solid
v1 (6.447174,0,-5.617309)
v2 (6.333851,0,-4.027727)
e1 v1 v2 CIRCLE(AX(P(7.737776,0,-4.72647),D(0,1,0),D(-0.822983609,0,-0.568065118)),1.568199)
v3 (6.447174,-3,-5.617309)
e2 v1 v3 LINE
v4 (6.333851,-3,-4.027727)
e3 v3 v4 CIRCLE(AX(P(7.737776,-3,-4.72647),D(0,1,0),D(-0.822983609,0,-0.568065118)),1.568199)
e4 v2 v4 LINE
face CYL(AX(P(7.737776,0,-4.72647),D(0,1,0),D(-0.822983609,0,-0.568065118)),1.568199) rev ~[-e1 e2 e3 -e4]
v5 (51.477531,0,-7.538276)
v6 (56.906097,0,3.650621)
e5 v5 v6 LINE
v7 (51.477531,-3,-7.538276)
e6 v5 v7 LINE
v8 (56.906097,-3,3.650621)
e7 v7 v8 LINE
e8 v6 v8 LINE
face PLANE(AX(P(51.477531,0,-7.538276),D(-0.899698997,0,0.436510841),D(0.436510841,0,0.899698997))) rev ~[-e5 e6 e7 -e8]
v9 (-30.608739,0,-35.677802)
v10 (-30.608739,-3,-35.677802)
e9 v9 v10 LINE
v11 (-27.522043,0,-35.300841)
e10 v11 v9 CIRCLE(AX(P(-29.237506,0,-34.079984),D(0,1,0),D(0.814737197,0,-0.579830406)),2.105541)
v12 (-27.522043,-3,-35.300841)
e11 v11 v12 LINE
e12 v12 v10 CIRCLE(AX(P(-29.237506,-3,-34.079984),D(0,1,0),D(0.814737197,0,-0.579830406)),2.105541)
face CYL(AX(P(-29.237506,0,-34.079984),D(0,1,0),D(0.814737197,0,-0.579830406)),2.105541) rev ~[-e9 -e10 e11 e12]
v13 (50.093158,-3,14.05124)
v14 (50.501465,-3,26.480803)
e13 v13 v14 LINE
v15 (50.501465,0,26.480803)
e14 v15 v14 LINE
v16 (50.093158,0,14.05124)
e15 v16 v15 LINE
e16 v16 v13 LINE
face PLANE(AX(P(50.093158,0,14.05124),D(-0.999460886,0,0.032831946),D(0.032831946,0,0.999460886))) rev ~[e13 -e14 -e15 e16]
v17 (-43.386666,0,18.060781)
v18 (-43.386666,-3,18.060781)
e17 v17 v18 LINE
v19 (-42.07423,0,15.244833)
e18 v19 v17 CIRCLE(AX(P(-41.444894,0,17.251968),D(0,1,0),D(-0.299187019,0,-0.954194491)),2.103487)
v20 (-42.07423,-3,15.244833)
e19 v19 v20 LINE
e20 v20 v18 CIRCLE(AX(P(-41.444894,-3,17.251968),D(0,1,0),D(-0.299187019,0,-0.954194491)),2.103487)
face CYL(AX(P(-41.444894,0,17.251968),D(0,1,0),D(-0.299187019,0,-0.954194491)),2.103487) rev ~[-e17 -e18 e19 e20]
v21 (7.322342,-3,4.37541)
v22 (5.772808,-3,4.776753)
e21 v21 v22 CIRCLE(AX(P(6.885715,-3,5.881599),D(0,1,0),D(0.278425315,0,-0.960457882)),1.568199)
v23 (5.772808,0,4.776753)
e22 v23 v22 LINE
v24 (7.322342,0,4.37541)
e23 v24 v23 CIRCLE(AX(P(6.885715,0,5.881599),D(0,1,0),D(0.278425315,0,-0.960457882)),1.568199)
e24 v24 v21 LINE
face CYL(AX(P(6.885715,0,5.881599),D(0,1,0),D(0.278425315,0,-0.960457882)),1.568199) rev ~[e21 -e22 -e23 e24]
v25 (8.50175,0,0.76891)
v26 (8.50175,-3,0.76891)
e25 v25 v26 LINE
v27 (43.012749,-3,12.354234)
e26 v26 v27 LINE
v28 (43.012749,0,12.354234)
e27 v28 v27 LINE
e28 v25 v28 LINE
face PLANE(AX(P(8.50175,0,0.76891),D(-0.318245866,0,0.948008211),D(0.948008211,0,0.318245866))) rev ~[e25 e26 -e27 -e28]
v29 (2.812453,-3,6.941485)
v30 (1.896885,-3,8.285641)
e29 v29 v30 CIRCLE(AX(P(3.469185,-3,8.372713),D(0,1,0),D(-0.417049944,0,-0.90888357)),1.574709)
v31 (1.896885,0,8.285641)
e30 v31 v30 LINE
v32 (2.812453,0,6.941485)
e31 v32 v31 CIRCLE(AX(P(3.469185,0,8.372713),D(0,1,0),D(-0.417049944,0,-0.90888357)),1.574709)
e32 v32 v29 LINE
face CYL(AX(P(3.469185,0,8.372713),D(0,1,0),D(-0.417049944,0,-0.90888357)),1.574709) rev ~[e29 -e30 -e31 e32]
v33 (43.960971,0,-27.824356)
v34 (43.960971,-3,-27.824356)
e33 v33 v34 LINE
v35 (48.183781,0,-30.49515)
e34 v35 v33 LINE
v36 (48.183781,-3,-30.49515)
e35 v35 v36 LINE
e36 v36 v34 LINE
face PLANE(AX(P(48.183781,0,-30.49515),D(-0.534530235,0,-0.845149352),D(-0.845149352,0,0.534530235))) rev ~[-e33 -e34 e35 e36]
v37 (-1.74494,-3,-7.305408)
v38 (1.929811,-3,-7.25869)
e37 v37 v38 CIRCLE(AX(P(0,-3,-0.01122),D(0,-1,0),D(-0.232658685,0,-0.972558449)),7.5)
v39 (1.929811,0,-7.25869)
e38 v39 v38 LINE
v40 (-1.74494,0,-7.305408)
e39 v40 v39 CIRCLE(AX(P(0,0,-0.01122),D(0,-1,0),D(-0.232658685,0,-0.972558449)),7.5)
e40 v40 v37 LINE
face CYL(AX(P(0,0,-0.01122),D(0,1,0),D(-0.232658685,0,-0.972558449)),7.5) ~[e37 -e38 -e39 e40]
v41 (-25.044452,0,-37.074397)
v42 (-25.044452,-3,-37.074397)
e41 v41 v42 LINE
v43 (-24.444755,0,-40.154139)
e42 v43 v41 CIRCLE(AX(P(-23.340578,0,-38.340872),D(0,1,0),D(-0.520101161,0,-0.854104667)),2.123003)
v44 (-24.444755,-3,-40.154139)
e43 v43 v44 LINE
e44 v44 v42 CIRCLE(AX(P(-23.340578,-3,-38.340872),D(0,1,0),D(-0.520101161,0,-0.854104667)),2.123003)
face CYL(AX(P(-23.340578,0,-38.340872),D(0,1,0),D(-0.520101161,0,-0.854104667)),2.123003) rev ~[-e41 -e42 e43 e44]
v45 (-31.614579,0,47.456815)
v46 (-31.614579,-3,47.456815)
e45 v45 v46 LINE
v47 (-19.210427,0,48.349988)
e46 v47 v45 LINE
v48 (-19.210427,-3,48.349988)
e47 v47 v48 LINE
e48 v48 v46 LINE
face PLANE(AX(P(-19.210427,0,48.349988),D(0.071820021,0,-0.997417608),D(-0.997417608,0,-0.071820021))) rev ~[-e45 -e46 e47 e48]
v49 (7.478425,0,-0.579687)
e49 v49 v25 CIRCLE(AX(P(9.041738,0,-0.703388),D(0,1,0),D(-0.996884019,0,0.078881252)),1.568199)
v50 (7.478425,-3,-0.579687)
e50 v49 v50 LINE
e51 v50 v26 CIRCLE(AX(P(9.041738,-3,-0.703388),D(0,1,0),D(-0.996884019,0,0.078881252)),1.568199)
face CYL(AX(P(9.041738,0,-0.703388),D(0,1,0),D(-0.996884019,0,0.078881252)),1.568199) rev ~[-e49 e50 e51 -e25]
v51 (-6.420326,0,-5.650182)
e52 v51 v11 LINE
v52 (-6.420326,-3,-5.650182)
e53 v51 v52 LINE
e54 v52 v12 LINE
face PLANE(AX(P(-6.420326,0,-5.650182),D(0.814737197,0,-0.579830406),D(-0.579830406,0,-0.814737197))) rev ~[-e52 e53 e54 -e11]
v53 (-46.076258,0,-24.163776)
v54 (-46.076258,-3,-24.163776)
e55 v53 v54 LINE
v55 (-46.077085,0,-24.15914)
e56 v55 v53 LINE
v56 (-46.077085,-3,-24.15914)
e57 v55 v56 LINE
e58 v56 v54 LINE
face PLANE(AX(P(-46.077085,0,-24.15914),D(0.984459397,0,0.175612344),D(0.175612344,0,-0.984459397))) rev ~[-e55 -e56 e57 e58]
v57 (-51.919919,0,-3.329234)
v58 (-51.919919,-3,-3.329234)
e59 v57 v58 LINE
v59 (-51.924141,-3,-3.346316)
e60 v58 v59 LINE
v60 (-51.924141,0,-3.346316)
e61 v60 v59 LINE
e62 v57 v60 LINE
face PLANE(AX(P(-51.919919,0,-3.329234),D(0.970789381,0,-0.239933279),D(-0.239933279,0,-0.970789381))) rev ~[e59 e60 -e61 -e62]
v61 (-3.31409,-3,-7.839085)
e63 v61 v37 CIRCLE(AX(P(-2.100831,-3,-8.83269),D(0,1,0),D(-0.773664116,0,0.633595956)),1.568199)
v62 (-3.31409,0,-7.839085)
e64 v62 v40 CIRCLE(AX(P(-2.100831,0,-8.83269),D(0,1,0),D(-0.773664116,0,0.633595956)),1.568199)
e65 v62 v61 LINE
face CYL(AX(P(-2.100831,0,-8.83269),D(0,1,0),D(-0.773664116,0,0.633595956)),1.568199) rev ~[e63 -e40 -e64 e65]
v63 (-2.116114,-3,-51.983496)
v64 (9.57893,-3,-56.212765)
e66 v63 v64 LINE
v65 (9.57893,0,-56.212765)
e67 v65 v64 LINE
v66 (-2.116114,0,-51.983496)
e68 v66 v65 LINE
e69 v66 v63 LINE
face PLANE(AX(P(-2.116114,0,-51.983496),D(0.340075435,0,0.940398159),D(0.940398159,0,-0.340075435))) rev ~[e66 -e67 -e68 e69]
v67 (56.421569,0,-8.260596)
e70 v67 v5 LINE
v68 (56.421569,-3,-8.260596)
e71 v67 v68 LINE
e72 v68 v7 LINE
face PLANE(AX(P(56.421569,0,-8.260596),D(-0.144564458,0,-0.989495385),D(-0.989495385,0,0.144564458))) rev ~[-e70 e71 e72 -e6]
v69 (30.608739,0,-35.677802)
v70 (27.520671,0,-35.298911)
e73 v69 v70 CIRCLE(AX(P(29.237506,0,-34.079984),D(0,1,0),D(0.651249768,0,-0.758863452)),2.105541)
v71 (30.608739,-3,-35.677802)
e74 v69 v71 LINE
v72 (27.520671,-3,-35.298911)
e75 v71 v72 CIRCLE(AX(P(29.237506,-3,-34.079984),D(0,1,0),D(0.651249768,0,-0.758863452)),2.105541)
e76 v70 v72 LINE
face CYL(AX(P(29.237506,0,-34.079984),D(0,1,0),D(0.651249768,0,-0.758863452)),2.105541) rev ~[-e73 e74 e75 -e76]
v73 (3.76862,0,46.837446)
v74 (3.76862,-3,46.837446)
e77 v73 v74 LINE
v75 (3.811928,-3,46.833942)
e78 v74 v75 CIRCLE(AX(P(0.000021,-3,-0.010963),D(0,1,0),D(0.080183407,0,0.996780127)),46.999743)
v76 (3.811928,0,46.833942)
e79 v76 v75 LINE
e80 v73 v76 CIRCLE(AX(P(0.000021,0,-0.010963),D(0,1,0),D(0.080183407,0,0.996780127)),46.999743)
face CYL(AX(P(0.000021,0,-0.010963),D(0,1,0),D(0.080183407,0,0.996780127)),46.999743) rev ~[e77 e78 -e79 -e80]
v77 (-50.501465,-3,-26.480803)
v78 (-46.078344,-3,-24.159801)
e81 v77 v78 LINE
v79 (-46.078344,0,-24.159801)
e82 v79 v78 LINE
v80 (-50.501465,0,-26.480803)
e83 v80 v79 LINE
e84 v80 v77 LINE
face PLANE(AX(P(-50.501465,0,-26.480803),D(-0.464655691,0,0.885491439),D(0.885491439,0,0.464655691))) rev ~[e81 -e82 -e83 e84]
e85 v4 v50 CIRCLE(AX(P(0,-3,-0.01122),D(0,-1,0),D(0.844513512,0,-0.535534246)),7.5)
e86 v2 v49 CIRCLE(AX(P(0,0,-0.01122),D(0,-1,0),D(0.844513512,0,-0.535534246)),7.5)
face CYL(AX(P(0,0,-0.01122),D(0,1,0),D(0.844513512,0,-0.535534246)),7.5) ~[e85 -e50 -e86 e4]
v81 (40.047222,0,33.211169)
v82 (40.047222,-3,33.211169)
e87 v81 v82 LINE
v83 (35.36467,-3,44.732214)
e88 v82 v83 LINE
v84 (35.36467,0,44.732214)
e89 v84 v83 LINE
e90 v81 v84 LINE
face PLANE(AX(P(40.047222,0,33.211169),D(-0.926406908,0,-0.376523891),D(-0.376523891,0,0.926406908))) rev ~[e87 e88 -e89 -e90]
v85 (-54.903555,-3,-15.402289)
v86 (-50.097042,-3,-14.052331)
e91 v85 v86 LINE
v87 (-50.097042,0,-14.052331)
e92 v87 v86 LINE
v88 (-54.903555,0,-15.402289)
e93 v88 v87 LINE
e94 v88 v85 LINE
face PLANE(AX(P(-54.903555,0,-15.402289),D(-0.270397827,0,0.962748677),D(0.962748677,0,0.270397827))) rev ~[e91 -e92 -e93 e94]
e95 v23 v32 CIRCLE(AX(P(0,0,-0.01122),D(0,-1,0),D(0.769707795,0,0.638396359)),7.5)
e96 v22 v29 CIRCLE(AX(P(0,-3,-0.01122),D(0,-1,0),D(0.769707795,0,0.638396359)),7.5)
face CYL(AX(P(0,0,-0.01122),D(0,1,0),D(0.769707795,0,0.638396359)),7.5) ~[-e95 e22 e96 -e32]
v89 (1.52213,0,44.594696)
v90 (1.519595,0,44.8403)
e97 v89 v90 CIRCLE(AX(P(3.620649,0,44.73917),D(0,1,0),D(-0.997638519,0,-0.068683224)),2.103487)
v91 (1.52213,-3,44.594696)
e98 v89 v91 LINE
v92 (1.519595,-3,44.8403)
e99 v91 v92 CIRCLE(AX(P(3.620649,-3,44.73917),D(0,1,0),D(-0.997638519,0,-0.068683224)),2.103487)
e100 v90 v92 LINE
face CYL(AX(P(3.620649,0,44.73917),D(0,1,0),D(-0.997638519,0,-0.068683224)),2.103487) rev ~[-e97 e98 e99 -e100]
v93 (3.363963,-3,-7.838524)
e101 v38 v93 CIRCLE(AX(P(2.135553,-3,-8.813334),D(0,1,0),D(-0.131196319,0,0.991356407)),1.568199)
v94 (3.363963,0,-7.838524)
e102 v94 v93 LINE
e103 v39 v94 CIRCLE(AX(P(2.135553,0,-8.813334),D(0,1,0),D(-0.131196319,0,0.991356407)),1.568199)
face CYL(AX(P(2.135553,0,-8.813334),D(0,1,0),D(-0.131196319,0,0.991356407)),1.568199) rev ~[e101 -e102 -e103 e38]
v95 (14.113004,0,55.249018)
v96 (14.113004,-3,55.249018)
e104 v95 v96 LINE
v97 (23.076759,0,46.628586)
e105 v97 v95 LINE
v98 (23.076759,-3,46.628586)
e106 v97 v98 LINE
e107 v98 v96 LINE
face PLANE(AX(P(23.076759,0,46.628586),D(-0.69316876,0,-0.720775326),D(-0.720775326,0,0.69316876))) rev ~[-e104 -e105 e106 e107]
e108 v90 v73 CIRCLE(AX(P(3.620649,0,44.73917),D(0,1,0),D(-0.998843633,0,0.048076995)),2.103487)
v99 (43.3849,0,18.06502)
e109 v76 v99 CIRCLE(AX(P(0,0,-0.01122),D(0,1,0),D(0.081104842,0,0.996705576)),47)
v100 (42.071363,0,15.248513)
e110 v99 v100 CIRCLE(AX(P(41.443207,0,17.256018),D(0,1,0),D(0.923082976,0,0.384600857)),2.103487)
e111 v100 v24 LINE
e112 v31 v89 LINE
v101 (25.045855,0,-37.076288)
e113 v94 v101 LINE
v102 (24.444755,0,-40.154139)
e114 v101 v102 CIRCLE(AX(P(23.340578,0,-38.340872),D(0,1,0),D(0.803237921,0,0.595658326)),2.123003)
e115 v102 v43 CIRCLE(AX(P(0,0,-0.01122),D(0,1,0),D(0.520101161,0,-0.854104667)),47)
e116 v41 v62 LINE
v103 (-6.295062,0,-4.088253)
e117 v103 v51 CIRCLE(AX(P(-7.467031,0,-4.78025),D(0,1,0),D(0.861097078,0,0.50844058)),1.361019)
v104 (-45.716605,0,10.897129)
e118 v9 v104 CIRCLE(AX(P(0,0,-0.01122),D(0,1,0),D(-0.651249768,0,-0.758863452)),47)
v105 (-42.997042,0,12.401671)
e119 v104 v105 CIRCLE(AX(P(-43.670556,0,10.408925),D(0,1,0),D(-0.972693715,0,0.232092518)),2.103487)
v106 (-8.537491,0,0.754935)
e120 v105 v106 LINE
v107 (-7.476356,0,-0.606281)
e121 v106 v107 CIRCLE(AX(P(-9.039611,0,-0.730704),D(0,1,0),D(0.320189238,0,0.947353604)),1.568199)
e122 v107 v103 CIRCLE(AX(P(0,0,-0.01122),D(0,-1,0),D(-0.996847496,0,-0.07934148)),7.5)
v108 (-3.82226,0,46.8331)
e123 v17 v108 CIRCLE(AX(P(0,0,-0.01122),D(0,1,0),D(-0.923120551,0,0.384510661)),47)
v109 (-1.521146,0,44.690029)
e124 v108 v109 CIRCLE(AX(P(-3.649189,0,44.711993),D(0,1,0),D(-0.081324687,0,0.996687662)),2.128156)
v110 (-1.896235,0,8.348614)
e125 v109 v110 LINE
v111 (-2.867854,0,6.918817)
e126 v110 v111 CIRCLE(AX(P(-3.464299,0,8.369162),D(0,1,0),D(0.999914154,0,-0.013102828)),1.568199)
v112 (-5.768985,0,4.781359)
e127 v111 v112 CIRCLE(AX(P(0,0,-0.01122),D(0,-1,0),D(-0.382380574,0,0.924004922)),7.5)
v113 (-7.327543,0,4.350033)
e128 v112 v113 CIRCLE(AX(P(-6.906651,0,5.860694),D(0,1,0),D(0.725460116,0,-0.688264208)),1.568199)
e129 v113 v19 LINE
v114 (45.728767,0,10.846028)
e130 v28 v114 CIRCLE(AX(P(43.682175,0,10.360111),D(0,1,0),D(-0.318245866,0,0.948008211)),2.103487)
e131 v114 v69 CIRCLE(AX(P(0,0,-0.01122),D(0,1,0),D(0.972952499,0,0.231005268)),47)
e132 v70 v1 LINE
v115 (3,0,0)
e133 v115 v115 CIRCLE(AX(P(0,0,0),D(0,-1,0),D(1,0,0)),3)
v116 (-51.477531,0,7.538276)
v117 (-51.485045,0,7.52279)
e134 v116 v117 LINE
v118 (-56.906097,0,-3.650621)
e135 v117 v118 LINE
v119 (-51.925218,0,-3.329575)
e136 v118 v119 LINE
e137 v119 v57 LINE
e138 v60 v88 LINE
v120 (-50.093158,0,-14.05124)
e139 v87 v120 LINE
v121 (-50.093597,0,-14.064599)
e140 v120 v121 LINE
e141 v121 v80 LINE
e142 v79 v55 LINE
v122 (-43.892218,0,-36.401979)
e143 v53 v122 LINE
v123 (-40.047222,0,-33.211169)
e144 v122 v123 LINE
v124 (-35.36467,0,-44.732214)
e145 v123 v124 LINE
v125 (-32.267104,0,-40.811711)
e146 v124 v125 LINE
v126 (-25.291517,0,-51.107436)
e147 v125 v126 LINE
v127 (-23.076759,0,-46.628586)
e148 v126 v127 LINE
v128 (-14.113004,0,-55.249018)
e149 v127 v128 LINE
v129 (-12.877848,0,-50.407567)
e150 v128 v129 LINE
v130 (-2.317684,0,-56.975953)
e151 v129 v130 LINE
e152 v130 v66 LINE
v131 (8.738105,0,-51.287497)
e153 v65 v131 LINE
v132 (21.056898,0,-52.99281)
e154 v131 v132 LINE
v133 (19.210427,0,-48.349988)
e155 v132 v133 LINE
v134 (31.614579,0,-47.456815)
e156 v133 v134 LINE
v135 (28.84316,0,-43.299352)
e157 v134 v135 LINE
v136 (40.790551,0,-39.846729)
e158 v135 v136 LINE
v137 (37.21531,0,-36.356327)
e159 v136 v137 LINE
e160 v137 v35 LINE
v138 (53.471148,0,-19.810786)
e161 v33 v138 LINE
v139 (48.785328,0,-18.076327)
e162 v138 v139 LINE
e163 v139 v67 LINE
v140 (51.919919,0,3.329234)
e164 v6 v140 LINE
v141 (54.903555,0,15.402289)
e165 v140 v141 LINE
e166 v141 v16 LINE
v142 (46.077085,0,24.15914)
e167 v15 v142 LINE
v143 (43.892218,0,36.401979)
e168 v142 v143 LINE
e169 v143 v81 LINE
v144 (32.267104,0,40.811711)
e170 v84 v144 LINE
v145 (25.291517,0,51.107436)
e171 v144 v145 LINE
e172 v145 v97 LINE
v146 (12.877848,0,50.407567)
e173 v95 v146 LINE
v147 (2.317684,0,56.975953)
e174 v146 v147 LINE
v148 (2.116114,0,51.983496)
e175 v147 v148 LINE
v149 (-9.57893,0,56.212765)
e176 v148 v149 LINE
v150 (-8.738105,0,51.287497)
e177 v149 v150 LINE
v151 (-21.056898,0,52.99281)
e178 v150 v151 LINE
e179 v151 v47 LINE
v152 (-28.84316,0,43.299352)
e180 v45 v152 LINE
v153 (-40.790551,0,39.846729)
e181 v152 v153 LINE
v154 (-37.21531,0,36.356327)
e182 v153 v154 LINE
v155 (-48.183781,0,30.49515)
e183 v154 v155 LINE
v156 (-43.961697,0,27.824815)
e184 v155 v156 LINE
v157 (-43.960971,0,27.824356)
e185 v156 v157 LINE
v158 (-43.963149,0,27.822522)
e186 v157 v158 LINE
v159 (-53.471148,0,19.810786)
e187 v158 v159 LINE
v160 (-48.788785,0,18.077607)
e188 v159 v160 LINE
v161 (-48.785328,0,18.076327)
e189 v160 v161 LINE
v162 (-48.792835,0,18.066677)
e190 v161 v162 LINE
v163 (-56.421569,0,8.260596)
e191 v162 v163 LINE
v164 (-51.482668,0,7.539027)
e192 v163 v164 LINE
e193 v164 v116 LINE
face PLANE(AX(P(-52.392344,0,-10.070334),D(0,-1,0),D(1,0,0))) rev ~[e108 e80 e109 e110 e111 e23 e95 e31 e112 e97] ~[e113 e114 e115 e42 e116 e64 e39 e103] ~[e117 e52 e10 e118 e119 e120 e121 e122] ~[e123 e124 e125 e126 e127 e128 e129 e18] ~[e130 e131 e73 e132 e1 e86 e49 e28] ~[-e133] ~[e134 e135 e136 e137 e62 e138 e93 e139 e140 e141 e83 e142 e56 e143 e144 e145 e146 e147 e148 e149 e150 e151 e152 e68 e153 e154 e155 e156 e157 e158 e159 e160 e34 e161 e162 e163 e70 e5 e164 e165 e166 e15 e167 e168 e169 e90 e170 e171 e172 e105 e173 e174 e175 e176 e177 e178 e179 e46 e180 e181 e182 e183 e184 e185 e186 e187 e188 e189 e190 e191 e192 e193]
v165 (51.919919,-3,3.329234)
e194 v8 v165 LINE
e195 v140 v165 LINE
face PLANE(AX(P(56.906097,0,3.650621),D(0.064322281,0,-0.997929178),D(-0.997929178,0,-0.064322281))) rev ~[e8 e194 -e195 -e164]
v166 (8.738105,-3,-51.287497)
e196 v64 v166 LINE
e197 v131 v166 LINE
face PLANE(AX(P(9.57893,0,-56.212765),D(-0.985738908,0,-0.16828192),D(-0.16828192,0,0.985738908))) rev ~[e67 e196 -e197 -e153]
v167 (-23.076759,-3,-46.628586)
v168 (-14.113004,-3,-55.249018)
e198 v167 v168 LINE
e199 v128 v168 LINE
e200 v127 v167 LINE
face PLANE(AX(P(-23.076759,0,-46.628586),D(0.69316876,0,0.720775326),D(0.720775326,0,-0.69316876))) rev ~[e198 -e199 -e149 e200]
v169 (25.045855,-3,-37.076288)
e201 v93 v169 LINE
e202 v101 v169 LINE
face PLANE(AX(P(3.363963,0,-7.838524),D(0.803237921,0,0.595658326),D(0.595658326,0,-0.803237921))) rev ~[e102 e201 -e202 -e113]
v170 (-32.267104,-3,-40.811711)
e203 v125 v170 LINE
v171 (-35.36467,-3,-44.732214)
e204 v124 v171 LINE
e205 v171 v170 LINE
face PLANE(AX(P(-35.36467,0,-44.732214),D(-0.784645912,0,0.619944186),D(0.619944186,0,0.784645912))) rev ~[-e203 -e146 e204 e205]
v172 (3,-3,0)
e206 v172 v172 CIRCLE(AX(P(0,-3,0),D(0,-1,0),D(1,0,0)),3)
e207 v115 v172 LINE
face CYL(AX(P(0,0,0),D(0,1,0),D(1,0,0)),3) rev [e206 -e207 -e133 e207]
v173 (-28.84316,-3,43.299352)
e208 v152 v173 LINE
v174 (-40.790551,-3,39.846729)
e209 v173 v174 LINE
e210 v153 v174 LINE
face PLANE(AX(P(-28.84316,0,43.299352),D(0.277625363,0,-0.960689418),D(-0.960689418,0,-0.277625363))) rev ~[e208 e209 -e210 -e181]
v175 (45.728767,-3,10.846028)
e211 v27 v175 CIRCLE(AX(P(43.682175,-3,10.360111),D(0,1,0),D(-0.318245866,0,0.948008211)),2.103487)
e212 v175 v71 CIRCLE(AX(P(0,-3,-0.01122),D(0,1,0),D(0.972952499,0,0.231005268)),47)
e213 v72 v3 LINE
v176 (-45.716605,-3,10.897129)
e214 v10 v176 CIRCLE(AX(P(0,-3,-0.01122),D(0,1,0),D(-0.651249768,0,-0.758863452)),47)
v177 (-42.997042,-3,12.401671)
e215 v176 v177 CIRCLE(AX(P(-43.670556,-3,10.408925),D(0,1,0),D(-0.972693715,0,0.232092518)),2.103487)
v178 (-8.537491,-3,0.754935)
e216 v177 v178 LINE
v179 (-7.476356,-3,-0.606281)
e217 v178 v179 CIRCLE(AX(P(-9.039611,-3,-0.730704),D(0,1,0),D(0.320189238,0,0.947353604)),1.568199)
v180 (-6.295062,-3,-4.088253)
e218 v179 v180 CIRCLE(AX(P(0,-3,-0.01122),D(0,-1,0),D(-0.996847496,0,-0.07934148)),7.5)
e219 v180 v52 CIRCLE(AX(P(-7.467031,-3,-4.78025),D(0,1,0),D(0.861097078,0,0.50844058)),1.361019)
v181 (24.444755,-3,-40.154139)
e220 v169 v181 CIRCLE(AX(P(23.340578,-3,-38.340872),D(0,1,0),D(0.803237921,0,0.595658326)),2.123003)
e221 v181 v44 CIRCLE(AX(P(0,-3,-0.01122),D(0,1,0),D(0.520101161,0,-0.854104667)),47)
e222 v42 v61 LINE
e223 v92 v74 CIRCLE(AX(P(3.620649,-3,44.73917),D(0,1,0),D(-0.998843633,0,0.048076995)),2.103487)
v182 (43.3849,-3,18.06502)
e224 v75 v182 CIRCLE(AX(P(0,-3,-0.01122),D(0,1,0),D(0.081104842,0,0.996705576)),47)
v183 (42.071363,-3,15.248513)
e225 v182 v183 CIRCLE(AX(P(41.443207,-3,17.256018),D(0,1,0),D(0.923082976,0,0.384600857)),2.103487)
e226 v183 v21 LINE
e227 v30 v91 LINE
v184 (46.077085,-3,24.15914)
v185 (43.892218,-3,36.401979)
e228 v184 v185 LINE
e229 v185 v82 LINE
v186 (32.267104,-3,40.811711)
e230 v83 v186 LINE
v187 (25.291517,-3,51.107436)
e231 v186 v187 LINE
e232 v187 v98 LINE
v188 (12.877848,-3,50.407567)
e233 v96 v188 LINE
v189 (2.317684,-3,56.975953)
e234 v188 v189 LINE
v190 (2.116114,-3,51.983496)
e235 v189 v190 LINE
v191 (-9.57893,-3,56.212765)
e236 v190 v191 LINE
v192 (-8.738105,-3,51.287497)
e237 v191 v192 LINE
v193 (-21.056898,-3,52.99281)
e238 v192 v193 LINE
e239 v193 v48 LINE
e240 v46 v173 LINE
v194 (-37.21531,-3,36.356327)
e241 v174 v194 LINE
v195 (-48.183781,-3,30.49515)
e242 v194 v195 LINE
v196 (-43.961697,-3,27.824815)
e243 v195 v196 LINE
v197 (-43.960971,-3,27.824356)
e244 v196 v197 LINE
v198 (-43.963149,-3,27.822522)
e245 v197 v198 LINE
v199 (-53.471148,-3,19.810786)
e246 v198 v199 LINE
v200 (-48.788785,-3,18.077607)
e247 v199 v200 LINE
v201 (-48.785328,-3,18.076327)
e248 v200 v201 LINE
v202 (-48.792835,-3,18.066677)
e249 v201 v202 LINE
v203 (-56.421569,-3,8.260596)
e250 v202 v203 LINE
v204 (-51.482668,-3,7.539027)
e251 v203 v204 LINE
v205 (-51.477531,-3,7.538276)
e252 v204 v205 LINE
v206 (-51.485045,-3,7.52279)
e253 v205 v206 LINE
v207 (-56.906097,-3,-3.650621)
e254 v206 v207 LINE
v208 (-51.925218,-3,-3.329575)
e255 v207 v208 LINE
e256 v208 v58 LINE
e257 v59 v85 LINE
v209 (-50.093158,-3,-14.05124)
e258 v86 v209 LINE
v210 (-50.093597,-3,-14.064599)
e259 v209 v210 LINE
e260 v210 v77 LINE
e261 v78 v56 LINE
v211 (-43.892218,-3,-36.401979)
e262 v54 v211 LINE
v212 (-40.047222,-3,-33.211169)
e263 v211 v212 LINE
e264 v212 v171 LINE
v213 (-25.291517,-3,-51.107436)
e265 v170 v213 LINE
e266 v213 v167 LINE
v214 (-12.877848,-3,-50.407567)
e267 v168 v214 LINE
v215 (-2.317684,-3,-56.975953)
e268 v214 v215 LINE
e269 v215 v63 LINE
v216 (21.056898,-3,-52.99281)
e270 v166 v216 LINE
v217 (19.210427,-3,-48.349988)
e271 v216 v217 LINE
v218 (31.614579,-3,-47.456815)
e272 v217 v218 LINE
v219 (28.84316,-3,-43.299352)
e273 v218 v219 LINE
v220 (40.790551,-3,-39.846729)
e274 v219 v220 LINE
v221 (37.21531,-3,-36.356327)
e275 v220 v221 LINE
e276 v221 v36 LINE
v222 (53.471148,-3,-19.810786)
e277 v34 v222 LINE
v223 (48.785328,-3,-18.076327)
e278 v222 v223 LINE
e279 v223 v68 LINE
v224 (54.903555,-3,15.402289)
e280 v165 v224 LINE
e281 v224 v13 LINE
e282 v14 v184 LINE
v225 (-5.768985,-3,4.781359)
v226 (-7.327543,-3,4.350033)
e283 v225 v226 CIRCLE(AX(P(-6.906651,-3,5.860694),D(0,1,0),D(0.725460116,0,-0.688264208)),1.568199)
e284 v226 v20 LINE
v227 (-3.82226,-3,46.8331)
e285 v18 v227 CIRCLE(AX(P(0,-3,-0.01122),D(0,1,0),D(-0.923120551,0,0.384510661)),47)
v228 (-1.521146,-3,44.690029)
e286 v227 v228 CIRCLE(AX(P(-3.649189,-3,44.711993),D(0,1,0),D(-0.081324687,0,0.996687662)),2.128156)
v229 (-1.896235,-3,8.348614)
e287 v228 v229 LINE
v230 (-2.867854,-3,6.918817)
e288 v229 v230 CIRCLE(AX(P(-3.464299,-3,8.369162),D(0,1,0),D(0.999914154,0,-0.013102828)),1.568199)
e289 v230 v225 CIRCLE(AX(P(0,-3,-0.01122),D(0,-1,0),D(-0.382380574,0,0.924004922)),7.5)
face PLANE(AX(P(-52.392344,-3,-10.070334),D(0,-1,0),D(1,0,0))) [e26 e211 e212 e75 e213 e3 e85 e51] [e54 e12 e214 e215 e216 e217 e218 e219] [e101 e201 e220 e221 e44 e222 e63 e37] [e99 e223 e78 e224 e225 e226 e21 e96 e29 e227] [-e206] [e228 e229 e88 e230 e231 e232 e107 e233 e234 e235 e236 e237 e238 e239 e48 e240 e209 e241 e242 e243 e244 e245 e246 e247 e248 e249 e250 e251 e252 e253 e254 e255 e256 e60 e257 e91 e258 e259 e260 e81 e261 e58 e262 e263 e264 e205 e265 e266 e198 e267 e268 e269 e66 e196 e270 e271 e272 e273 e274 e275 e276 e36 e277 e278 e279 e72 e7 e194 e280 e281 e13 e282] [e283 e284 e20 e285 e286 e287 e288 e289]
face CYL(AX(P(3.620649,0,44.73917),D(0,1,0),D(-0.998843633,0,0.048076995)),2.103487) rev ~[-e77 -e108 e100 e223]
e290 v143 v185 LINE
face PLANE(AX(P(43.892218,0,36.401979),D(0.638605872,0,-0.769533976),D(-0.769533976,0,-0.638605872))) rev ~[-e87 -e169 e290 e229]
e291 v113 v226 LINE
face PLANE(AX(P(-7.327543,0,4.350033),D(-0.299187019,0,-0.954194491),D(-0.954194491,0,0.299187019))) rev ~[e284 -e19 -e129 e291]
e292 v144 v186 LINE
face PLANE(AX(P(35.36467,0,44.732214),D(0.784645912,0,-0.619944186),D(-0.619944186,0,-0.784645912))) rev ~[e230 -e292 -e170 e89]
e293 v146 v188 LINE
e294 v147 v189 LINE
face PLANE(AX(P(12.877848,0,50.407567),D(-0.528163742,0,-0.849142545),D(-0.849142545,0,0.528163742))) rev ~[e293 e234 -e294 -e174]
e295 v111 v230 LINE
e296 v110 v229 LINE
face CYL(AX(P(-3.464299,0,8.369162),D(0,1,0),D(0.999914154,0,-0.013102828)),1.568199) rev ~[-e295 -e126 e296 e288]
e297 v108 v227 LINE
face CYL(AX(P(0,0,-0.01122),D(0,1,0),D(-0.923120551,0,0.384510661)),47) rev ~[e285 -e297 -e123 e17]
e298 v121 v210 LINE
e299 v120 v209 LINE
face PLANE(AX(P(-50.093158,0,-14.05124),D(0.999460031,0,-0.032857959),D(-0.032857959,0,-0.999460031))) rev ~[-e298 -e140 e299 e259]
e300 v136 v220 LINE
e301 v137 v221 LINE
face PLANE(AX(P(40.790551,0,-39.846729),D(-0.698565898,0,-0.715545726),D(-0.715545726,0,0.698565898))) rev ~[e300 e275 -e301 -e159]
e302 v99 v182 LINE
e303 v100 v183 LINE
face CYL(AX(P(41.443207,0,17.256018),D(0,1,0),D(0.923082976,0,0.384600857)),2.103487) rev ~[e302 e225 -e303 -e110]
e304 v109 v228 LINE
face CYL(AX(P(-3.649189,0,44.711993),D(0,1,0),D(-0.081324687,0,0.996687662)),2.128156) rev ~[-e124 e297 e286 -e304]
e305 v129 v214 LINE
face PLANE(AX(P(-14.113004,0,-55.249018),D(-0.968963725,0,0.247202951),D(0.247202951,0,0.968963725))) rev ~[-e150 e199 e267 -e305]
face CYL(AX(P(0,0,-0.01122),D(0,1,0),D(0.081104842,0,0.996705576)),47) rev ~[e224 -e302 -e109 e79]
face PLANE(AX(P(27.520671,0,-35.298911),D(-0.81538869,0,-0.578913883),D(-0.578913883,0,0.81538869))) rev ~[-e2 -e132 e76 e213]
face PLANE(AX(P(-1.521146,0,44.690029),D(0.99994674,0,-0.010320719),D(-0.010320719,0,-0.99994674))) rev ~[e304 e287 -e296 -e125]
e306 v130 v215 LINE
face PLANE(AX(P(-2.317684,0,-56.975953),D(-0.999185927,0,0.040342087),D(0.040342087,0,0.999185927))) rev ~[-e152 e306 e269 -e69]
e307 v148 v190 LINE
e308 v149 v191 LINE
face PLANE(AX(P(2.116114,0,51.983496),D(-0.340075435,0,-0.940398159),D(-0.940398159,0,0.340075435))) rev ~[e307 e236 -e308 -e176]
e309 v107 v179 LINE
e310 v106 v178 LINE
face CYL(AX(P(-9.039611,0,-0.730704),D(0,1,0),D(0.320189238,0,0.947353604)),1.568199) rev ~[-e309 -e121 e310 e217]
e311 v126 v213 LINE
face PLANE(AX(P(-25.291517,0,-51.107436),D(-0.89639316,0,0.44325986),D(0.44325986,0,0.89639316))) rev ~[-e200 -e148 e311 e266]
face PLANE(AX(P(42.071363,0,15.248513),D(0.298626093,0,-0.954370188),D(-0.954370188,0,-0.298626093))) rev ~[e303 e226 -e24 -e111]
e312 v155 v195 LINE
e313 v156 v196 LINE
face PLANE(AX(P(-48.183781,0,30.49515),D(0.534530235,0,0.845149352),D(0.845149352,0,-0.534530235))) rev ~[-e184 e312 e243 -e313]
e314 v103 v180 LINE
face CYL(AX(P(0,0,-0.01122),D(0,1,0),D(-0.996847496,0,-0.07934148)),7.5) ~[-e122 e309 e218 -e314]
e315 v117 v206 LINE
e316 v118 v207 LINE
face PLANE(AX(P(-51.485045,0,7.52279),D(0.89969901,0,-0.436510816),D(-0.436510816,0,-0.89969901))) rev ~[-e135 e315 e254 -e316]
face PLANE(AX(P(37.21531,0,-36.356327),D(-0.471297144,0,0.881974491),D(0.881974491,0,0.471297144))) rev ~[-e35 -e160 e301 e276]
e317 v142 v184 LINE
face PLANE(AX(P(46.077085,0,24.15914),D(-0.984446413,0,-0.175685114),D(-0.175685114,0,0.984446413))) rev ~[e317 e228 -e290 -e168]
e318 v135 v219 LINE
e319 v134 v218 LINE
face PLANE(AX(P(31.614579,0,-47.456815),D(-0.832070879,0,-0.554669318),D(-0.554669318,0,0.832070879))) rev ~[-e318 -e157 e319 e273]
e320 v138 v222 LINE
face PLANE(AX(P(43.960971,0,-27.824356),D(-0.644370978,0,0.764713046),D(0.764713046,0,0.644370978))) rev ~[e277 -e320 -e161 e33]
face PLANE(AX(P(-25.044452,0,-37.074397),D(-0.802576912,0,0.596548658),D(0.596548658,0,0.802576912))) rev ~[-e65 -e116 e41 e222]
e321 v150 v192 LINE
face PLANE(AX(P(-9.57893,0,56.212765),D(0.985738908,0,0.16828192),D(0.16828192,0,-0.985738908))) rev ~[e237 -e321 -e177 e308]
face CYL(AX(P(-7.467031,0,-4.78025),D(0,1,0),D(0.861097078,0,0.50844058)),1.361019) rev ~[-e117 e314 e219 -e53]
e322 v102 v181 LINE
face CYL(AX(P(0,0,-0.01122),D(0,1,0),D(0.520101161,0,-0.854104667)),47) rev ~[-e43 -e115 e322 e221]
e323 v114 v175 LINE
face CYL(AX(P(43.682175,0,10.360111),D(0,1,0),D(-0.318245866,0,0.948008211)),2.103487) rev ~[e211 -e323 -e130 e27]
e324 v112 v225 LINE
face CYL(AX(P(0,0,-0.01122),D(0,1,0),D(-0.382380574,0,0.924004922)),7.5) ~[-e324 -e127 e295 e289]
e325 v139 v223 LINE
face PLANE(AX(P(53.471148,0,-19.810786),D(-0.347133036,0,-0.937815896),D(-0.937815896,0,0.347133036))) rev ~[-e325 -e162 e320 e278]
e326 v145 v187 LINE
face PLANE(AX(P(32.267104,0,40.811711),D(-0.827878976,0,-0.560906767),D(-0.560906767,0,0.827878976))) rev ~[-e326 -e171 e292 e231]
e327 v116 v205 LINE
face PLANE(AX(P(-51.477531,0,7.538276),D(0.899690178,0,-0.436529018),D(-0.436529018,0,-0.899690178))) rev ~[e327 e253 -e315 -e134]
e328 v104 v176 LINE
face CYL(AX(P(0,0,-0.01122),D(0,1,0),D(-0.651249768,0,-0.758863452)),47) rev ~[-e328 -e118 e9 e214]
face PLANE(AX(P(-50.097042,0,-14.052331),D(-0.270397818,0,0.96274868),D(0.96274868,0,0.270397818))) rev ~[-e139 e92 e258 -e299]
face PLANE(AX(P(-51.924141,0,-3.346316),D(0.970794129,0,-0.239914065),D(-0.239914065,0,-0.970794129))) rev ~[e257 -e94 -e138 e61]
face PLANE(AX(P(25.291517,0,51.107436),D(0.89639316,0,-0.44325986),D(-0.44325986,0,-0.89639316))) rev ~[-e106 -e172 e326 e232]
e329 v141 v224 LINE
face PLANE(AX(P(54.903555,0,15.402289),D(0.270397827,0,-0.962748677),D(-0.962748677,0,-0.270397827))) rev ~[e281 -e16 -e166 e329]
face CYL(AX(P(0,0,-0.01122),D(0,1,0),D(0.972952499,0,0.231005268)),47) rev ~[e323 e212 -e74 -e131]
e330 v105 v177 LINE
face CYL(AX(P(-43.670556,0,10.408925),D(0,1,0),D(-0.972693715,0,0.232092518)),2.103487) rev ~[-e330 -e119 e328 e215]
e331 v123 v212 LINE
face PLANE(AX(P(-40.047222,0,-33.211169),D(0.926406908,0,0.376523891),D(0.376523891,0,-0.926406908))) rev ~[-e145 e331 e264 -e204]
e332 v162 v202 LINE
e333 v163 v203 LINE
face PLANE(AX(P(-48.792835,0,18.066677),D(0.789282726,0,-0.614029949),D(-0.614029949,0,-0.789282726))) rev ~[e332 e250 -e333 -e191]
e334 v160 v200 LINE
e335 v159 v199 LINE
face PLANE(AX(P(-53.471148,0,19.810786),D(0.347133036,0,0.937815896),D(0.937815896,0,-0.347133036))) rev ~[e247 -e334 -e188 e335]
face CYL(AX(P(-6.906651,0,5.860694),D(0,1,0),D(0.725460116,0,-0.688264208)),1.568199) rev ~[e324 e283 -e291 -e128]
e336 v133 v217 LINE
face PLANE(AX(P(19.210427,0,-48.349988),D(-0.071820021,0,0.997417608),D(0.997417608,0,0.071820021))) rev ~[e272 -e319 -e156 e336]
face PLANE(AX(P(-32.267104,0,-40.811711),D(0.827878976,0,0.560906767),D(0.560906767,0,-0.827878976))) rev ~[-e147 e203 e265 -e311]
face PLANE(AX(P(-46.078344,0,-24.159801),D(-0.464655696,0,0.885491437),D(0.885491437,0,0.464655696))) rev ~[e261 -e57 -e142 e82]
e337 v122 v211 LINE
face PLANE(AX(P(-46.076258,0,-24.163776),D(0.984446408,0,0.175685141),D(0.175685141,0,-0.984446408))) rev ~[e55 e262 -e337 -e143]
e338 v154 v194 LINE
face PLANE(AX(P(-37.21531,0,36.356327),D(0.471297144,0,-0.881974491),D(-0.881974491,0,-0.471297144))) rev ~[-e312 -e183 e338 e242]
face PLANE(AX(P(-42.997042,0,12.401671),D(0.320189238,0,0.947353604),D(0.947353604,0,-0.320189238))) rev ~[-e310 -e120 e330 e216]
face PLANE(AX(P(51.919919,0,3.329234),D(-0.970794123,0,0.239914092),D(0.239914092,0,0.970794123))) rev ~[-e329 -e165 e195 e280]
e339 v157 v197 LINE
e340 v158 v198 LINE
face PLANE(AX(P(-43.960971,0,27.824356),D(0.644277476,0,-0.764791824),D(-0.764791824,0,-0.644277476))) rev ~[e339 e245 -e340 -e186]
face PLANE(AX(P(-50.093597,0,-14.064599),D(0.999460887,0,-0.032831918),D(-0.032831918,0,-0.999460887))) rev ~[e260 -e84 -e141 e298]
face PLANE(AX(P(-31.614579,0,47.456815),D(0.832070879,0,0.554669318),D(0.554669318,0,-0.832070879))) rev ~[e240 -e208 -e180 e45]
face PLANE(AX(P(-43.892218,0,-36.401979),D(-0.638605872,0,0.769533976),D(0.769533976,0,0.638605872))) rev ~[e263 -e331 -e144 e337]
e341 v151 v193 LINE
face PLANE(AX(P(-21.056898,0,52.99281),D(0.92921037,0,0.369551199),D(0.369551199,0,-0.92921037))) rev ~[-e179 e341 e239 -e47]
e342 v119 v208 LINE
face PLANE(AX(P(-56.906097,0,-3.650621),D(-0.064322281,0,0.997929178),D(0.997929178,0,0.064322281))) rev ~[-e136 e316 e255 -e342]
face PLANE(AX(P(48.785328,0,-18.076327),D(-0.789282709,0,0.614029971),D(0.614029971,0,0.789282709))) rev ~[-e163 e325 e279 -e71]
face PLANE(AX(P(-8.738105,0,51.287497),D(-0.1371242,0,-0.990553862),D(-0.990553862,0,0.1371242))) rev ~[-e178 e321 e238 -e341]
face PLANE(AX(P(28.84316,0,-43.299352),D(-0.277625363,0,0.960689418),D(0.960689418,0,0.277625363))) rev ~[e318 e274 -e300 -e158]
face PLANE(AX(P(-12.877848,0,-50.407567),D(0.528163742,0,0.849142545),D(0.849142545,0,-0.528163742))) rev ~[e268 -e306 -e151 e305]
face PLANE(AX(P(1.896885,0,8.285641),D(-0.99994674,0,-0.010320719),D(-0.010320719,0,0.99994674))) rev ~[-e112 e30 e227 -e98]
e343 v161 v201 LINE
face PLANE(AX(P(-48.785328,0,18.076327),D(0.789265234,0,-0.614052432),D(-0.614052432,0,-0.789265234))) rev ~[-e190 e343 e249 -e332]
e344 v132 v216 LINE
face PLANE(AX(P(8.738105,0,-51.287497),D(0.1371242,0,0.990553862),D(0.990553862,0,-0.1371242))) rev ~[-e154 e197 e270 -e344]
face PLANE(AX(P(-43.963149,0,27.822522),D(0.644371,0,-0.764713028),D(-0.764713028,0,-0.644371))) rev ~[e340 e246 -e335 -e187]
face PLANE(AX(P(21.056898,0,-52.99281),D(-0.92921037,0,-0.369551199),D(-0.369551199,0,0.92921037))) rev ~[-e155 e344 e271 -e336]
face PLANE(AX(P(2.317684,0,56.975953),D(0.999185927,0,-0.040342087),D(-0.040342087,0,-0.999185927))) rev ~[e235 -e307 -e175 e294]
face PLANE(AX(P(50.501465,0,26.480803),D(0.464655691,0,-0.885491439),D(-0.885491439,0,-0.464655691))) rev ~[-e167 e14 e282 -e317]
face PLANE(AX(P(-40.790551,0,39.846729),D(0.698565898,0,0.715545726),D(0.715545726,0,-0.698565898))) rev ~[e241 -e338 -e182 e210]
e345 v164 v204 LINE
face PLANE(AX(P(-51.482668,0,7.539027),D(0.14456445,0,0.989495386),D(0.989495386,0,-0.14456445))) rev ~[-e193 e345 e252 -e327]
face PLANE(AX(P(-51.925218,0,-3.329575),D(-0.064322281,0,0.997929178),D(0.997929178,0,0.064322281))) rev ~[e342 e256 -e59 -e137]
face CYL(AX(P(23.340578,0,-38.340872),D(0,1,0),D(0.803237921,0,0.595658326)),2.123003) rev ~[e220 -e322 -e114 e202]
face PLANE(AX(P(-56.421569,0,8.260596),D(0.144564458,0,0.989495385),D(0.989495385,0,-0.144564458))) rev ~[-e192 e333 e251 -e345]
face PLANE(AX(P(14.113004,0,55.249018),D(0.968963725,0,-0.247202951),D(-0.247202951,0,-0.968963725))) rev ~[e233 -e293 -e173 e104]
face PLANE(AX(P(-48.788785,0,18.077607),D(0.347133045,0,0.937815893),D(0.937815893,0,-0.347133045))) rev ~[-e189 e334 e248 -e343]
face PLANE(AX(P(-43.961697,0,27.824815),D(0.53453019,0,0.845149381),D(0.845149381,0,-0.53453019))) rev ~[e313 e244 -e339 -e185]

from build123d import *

# Parameters (mm, degrees)
F0_R     = 3
F1_DEPTH = 3


# Not quite as in the source:
# - ends of sketch curves that miss each other by under 0.0002 mm in the source are joined


with BuildPart() as f1:
    # F0 (on Front) → F1 (new body)
    with BuildSketch(Plane.XZ):
        with BuildLine():
            Line((-54.9035550344, -15.4022894368), (-50.0970420264, -14.0523310253))
            ThreePointArc((-50.0970420264, -14.0523310253), (-51.2908672182, -8.7471555647), (-51.9241410289, -3.346315858))
            Line((-51.9241410289, -3.346315858), (-54.9035550344, -15.4022894368))
        make_face()
        with BuildLine():
            Line((-50.5014645894, -26.4808034175), (-46.078343983, -24.1598005565))
            ThreePointArc((-46.078343983, -24.1598005565), (-48.3503436649, -19.2173511497), (-50.0935968915, -14.0645987898))
            Line((-50.0935968915, -14.0645987898), (-50.5014645894, -26.4808034175))
        make_face()
        with BuildLine():
            Line((-40.0472224692, -33.2111693559), (-40.0453648746, -33.2096278115))
            ThreePointArc((-40.0453648746, -33.2096278115), (-43.2978694534, -28.8447489774), (-46.0762579844, -24.1637757408))
            Line((-46.0762579844, -24.1637757408), (-43.8922178089, -36.4019792199))
            Line((-43.8922178089, -36.4019792199), (-40.0472224692, -33.2111693559))
        make_face()
        with BuildLine():
            ThreePointArc((-37.213042666, 36.354113843), (19.5968885399, 48.1537005723), (51.9680282572, 0.0007375898))
            ThreePointArc((51.9680282572, 0.0007375898), (17.6216901599, -48.9108992815), (-40.0453648746, -33.2096278115))
            Line((-40.0453648746, -33.2096278115), (-40.0472224692, -33.2111693559))
            Line((-40.0472224692, -33.2111693559), (-35.3646704919, -44.7322138543))
            Line((-35.3646704919, -44.7322138543), (-32.2671041994, -40.8117113592))
            Line((-32.2671041994, -40.8117113592), (-25.291517376, -51.1074360943))
            Line((-25.291517376, -51.1074360943), (-23.0767586415, -46.6285857397))
            Line((-23.0767586415, -46.6285857397), (-14.1130035885, -55.2490181363))
            Line((-14.1130035885, -55.2490181363), (-12.8778479963, -50.4075671746))
            Line((-12.8778479963, -50.4075671746), (-2.3176838225, -56.9759529715))
            Line((-2.3176838225, -56.9759529715), (-2.1161135989, -51.9834960417))
            Line((-2.1161135989, -51.9834960417), (9.578929848, -56.2127652609))
            Line((9.578929848, -56.2127652609), (8.738105117, -51.2874966872))
            Line((8.738105117, -51.2874966872), (21.0568983194, -52.9928099697))
            Line((21.0568983194, -52.9928099697), (19.2104267092, -48.3499876228))
            Line((19.2104267092, -48.3499876228), (31.614579292, -47.456814595))
            Line((31.614579292, -47.456814595), (28.8431604724, -43.2993520904))
            Line((28.8431604724, -43.2993520904), (40.7905514459, -39.8467286995))
            Line((40.7905514459, -39.8467286995), (37.2153097181, -36.3563270982))
            Line((37.2153097181, -36.3563270982), (48.1837807669, -30.495149554))
            Line((48.1837807669, -30.495149554), (43.9609713502, -27.8243561548))
            Line((43.9609713502, -27.8243561548), (53.4711476569, -19.810786041))
            Line((53.4711476569, -19.810786041), (48.7853275862, -18.0763273313))
            Line((48.7853275862, -18.0763273313), (56.4215688113, -8.2605961153))
            Line((56.4215688113, -8.2605961153), (51.4775309087, -7.5382762637))
            Line((51.4775309087, -7.5382762637), (56.9060966679, 3.6506214993))
            Line((56.9060966679, 3.6506214993), (51.9199191138, 3.3292336493))
            Line((51.9199191138, 3.3292336493), (54.9035550344, 15.4022894368))
            Line((54.9035550344, 15.4022894368), (50.0931577143, 14.0512400765))
            Line((50.0931577143, 14.0512400765), (50.5014645894, 26.4808034175))
            Line((50.5014645894, 26.4808034175), (46.0770849491, 24.1591398869))
            Line((46.0770849491, 24.1591398869), (43.8922178089, 36.4019792199))
            Line((43.8922178089, 36.4019792199), (40.0472224692, 33.2111693559))
            Line((40.0472224692, 33.2111693559), (35.3646704919, 44.7322138543))
            Line((35.3646704919, 44.7322138543), (32.2671041994, 40.8117113592))
            Line((32.2671041994, 40.8117113592), (25.291517376, 51.1074360943))
            Line((25.291517376, 51.1074360943), (23.0767586415, 46.6285857397))
            Line((23.0767586415, 46.6285857397), (14.1130035885, 55.2490181363))
            Line((14.1130035885, 55.2490181363), (12.8778479963, 50.4075671746))
            Line((12.8778479963, 50.4075671746), (2.3176838225, 56.9759529715))
            Line((2.3176838225, 56.9759529715), (2.1161135989, 51.9834960417))
            Line((2.1161135989, 51.9834960417), (-9.578929848, 56.2127652609))
            Line((-9.578929848, 56.2127652609), (-8.738105117, 51.2874966872))
            Line((-8.738105117, 51.2874966872), (-21.0568983194, 52.9928099697))
            Line((-21.0568983194, 52.9928099697), (-19.2104267092, 48.3499876228))
            Line((-19.2104267092, 48.3499876228), (-31.614579292, 47.456814595))
            Line((-31.614579292, 47.456814595), (-28.8431604724, 43.2993520904))
            Line((-28.8431604724, 43.2993520904), (-40.7905514459, 39.8467286995))
            Line((-40.7905514459, 39.8467286995), (-37.2153097181, 36.3563270982))
            Line((-37.2153097181, 36.3563270982), (-37.213042666, 36.354113843))
        make_face()
        with BuildLine():
            ThreePointArc((-51.9252180927, -3.329575199), (-51.9892512273, 2.1081313753), (-51.4850447931, 7.5227900813))
            Line((-51.4850447931, 7.5227900813), (-56.9060966679, -3.6506214993))
            Line((-56.9060966679, -3.6506214993), (-51.9252180927, -3.329575199))
        make_face()
        with BuildLine():
            ThreePointArc((-51.4826684815, 7.5390268588), (-50.4134868512, 12.8733028114), (-48.7928353928, 18.0666772584))
            Line((-48.7928353928, 18.0666772584), (-56.4215688113, 8.2605961153))
            Line((-56.4215688113, 8.2605961153), (-51.4826684815, 7.5390268588))
        make_face()
        with BuildLine():
            ThreePointArc((-48.7887845482, 18.0776069276), (-46.6313999834, 23.0765536675), (-43.9631489083, 27.8225217319))
            Line((-43.9631489083, 27.8225217319), (-53.4711476569, 19.810786041))
            Line((-53.4711476569, 19.810786041), (-48.7887845482, 18.0776069276))
        make_face()
        with BuildLine():
            ThreePointArc((-43.9616965875, 27.8248148444), (-40.810980226, 32.2663921953), (-37.213042666, 36.354113843))
            Line((-37.213042666, 36.354113843), (-37.2153097181, 36.3563270982))
            Line((-37.2153097181, 36.3563270982), (-48.1837807669, 30.495149554))
            Line((-48.1837807669, 30.495149554), (-43.9616965875, 27.8248148444))
        make_face()
        with BuildLine():
            ThreePointArc((-40.0453648746, -33.2096278115), (17.6216901599, -48.9108992815), (51.9680282572, 0.0007375898))
            ThreePointArc((51.9680282572, 0.0007375898), (19.5968885399, 48.1537005723), (-37.213042666, 36.354113843))
            ThreePointArc((-37.213042666, 36.354113843), (-40.810980226, 32.2663921953), (-43.9616965875, 27.8248148444))
            Line((-43.9616965875, 27.8248148444), (-43.9609713502, 27.8243561548))
            Line((-43.9609713502, 27.8243561548), (-43.9631489083, 27.8225217319))
            ThreePointArc((-43.9631489083, 27.8225217319), (-46.6313999834, 23.0765536675), (-48.7887845482, 18.0776069276))
            Line((-48.7887845482, 18.0776069276), (-48.7853275862, 18.0763273313))
            Line((-48.7853275862, 18.0763273313), (-48.7928353928, 18.0666772584))
            ThreePointArc((-48.7928353928, 18.0666772584), (-50.4134868512, 12.8733028114), (-51.4826684815, 7.5390268588))
            Line((-51.4826684815, 7.5390268588), (-51.4775309087, 7.5382762637))
            Line((-51.4775309087, 7.5382762637), (-51.4850447931, 7.5227900813))
            ThreePointArc((-51.4850447931, 7.5227900813), (-51.9892512273, 2.1081313753), (-51.9252180927, -3.329575199))
            Line((-51.9252180927, -3.329575199), (-51.9199191138, -3.3292336493))
            Line((-51.9199191138, -3.3292336493), (-51.9241410289, -3.346315858))
            ThreePointArc((-51.9241410289, -3.346315858), (-51.2908672182, -8.7471555647), (-50.0970420264, -14.0523310253))
            Line((-50.0970420264, -14.0523310253), (-50.0931577143, -14.0512400765))
            Line((-50.0931577143, -14.0512400765), (-50.0935968915, -14.0645987898))
            ThreePointArc((-50.0935968915, -14.0645987898), (-48.3503436649, -19.2173511497), (-46.078343983, -24.1598005565))
            Line((-46.078343983, -24.1598005565), (-46.0770849491, -24.1591398869))
            Line((-46.0770849491, -24.1591398869), (-46.0762579844, -24.1637757408))
            ThreePointArc((-46.0762579844, -24.1637757408), (-43.2978694534, -28.8447489774), (-40.0453648746, -33.2096278115))
        make_face()
        with BuildLine():
            ThreePointArc((-30.6087391151, -35.6778020758), (-44.7067731309, -14.5130968099), (-45.716604598, 10.8971285435))
            ThreePointArc((-45.716604598, 10.8971285435), (-44.6888266126, 12.2495178643), (-42.9970423633, 12.4016708018))
            Line((-42.9970423633, 12.4016708018), (-8.5374908198, 0.7549345664))
            ThreePointArc((-8.5374908198, 0.7549345664), (-7.802812606, 0.2334413444), (-7.4763562171, -0.606280922))
            ThreePointArc((-7.4763562171, -0.606280922), (-7.1023953356, -2.4207800492), (-6.295061591, -4.0882530021))
            ThreePointArc((-6.295061591, -4.0882530021), (-6.110368074, -4.8890528159), (-6.4203264896, -5.6501821199))
            Line((-6.4203264896, -5.6501821199), (-27.5220429881, -35.3008406001))
            ThreePointArc((-27.5220429881, -35.3008406001), (-28.982263813, -36.169997062), (-30.6087391151, -35.6778020758))
        make_face(mode=Mode.SUBTRACT)
        with BuildLine():
            ThreePointArc((-3.3140903569, -7.8390852899), (-2.605779553, -7.348009739), (-1.7449401376, -7.3054081862))
            ThreePointArc((-1.7449401376, -7.3054081862), (0.0953413286, -7.5106137979), (1.9298112192, -7.258690321))
            ThreePointArc((1.9298112192, -7.258690321), (2.7233576861, -7.359465878), (3.3639632378, -7.8385235312))
            Line((3.3639632378, -7.8385235312), (25.0458548563, -37.0762875112))
            ThreePointArc((25.0458548563, -37.0762875112), (25.4242166332, -38.7478039241), (24.4447545721, -40.15413917))
            ThreePointArc((24.4447545721, -40.15413917), (0, -47.0112198203), (-24.4447545721, -40.15413917))
            ThreePointArc((-24.4447545721, -40.15413917), (-25.4244419331, -38.7466486047), (-25.0444515303, -37.0743973345))
            Line((-25.0444515303, -37.0743973345), (-3.3140903569, -7.8390852899))
        make_face(mode=Mode.SUBTRACT)
        Circle(F0_R, mode=Mode.SUBTRACT)
        with BuildLine():
            ThreePointArc((6.4471741649, -5.6173093292), (6.1735472682, -4.8379856687), (6.3338513372, -4.0277266657))
            ThreePointArc((6.3338513372, -4.0277266657), (7.1180750013, -2.3740588492), (7.4784253342, -0.5796866358))
            ThreePointArc((7.4784253342, -0.5796866358), (7.7924795682, 0.2445578995), (8.501749914, 0.7689095872))
            Line((8.501749914, 0.7689095872), (43.0127487418, 12.3542340284))
            ThreePointArc((43.0127487418, 12.3542340284), (44.7033596143, 12.1990887403), (45.7287674683, 10.8460277972))
            ThreePointArc((45.7287674683, 10.8460277972), (44.6986623329, -14.5380772109), (30.6087391151, -35.6778020758))
            ThreePointArc((30.6087391151, -35.6778020758), (28.981088763, -36.1698532243), (27.5206712423, -35.2989108229))
            Line((27.5206712423, -35.2989108229), (6.4471741649, -5.6173093292))
        make_face(mode=Mode.SUBTRACT)
        with BuildLine():
            ThreePointArc((-3.8222602806, 46.8331002873), (-2.1987863566, 46.2693571068), (-1.5211456849, 44.6900290612))
            Line((-1.5211456849, 44.6900290612), (-1.8962351794, 8.3486142496))
            ThreePointArc((-1.8962351794, 8.3486142496), (-2.1672430487, 7.4877471123), (-2.8678543046, 6.9188170979))
            ThreePointArc((-2.8678543046, 6.9188170979), (-4.448699798, 6.0269148343), (-5.7689849741, 4.7813590646))
            ThreePointArc((-5.7689849741, 4.7813590646), (-6.4883786855, 4.349305408), (-7.327543237, 4.3500331389))
            Line((-7.327543237, 4.3500331389), (-42.0742299498, 15.2448326022))
            ThreePointArc((-42.0742299498, 15.2448326022), (-43.3514722345, 16.3633646212), (-43.3866659022, 18.060781228))
            ThreePointArc((-43.3866659022, 18.060781228), (-27.6429423876, 38.0001960459), (-3.8222602806, 46.8331002873))
        make_face(mode=Mode.SUBTRACT)
        with BuildLine():
            ThreePointArc((7.3223415791, 4.3754103913), (6.4925133297, 4.3634953347), (5.7728084591, 4.7767528711))
            ThreePointArc((5.7728084591, 4.7767528711), (4.4269848697, 6.0428535987), (2.8124529645, 6.9414852879))
            ThreePointArc((2.8124529645, 6.9414852879), (2.1677110719, 7.4862173416), (1.8968851416, 8.2856411552))
            Line((1.8968851416, 8.2856411552), (1.5221296421, 44.5946960866))
            ThreePointArc((1.5221296421, 44.5946960866), (1.51727433, 44.7174608453), (1.5195947017, 44.8402996661))
            ThreePointArc((1.5195947017, 44.8402996661), (2.223945132, 46.3120259473), (3.7686203119, 46.8374461259))
            ThreePointArc((3.7686203119, 46.8374461259), (3.7902743371, 46.8356991867), (3.8119275524, 46.8339422387))
            ThreePointArc((3.8119275524, 46.8339422387), (27.6368928258, 38.0045947169), (43.3848998793, 18.0650204541))
            ThreePointArc((43.3848998793, 18.0650204541), (43.3495674455, 16.3669469507), (42.0713630645, 15.2485125252))
            Line((42.0713630645, 15.2485125252), (7.3223415791, 4.3754103913))
        make_face(mode=Mode.SUBTRACT)
    extrude(amount=F1_DEPTH)


solid = f1.part
